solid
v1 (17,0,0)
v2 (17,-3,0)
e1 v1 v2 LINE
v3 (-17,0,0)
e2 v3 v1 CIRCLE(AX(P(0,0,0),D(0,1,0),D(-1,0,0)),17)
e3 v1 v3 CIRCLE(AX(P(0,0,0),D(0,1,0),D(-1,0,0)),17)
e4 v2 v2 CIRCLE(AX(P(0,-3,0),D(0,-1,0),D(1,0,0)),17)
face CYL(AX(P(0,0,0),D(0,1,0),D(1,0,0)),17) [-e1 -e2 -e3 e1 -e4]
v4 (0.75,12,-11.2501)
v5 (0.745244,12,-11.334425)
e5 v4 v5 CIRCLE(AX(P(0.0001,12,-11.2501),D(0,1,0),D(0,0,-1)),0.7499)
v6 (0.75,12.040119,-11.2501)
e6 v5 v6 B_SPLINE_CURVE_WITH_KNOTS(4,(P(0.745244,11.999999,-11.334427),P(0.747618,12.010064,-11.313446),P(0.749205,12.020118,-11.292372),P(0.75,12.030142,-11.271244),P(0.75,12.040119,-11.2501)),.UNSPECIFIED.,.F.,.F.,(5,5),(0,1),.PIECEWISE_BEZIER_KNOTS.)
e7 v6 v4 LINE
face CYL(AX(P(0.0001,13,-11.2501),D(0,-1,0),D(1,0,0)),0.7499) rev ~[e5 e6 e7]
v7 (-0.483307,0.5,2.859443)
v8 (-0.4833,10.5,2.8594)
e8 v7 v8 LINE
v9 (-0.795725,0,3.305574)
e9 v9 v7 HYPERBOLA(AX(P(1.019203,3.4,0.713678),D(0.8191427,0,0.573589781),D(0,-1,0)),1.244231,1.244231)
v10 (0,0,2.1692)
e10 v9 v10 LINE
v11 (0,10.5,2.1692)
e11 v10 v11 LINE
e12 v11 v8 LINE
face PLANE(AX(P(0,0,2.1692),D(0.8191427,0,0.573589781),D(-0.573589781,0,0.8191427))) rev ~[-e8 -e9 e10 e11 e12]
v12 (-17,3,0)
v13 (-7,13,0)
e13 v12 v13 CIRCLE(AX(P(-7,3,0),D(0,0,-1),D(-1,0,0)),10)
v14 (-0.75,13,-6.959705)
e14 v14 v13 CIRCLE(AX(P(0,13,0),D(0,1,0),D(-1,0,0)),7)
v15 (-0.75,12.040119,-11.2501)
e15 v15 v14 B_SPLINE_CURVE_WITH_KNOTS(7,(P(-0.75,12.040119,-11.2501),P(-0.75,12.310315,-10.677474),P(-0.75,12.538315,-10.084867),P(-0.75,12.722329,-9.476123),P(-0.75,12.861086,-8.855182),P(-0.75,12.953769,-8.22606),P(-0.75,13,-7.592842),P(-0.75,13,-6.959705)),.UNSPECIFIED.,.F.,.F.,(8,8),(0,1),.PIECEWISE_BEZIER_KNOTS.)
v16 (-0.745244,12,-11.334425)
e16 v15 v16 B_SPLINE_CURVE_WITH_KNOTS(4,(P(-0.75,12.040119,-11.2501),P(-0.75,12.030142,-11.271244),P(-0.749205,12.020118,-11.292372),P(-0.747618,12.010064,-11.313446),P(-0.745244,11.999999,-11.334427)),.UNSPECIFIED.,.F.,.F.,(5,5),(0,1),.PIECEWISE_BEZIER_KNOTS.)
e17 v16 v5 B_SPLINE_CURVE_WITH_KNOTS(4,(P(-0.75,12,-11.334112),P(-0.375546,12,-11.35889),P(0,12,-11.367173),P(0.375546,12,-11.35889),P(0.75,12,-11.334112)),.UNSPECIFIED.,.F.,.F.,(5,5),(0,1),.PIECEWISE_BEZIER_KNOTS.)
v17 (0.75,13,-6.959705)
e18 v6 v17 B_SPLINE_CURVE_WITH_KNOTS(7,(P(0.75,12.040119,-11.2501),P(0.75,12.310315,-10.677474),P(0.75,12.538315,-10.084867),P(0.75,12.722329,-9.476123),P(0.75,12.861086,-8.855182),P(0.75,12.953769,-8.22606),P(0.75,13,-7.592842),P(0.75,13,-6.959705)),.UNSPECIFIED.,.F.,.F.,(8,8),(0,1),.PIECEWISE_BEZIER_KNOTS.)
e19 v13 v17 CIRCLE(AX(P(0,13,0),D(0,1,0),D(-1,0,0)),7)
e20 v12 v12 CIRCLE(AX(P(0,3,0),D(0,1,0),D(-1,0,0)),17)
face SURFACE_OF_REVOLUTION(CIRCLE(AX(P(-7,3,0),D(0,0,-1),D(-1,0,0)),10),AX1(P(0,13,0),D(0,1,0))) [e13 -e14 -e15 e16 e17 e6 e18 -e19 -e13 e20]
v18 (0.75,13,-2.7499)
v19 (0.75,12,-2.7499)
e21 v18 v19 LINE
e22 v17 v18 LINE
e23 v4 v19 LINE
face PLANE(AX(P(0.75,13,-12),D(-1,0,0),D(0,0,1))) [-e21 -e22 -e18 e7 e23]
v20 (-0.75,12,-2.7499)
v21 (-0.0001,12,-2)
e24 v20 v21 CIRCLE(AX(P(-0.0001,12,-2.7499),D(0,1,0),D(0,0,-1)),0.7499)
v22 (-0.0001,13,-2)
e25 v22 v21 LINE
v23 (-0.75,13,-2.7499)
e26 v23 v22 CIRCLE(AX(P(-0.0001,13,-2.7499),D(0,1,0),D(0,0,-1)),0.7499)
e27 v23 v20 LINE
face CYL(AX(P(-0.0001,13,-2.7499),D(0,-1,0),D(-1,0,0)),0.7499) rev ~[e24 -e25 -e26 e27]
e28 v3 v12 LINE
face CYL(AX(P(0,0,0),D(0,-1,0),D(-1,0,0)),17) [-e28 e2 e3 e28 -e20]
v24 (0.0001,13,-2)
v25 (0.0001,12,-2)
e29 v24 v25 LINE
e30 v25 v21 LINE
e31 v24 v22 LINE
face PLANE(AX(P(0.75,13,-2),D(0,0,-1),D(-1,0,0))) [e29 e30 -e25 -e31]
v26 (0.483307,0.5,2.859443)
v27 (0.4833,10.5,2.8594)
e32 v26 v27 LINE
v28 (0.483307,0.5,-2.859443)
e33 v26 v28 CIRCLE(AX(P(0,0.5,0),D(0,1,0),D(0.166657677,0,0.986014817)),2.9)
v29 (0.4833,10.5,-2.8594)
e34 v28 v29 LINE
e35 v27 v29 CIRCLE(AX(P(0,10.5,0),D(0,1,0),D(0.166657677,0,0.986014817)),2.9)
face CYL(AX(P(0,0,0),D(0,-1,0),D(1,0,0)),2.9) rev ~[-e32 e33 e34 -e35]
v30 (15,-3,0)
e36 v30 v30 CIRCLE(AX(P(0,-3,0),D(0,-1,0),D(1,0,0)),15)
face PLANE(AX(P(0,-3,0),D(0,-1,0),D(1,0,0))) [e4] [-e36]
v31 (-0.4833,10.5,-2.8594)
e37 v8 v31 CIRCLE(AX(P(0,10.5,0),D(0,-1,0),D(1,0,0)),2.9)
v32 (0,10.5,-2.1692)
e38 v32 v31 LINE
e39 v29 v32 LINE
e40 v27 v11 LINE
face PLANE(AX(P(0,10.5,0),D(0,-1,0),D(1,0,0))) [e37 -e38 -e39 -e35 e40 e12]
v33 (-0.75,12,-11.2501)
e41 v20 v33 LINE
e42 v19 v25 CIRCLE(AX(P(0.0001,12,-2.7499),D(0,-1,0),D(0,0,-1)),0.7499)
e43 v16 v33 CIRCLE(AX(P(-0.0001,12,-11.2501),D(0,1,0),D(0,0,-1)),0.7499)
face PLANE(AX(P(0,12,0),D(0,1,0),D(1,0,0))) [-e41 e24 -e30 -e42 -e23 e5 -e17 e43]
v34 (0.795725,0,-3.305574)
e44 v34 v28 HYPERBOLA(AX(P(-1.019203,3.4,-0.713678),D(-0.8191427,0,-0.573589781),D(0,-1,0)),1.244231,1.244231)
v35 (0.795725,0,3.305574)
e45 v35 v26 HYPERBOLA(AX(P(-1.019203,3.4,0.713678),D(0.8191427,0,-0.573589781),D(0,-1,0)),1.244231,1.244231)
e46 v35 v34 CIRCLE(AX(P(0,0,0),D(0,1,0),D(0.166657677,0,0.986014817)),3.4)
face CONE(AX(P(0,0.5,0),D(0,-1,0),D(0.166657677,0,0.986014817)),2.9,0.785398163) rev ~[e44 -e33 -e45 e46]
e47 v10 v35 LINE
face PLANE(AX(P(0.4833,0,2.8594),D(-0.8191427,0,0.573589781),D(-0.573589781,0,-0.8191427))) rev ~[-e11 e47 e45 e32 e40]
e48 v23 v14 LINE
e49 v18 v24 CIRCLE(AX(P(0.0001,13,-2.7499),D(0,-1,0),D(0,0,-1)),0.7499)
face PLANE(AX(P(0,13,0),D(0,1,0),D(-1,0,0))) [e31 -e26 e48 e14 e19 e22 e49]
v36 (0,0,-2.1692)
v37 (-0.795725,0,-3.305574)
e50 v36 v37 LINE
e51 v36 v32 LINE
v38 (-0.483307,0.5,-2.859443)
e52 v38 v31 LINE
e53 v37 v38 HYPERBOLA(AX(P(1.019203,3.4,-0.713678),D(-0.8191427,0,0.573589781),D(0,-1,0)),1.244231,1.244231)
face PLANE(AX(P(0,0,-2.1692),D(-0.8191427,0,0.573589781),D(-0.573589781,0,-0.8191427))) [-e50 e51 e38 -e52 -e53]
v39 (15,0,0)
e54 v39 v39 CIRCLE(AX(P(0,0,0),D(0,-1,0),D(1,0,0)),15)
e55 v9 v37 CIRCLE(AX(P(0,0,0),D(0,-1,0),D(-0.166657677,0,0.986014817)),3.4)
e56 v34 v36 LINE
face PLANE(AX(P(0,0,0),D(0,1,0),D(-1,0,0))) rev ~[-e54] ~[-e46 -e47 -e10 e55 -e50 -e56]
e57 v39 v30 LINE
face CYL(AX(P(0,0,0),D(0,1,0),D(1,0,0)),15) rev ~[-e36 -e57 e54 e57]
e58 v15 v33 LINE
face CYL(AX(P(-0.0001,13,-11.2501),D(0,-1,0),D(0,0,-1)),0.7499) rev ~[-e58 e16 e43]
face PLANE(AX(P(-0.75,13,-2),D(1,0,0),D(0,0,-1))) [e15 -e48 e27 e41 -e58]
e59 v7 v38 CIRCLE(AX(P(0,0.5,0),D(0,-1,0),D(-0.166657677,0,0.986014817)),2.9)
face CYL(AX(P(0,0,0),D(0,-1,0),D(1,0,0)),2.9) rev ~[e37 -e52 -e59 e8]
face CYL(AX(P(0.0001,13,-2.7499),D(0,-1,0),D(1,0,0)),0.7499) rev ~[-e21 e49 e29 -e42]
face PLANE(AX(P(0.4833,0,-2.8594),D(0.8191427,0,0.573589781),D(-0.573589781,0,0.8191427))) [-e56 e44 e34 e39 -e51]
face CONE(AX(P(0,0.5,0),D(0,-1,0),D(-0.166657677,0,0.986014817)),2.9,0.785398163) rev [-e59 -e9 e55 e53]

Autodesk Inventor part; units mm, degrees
ref_plane "YZ Plane" through (0, 0, 0) normal (1, 0, 0) x (0, 1, 0)
ref_plane "XZ Plane" through (0, 0, 0) normal (0, 1, 0) x (-1, 0, 0)
ref_plane "XY Plane" through (0, 0, 0) normal (0, 0, 1) x (1, 0, 0)
sketch "Sketch1" plane through (0, 0, 0) normal (0, 1, 0) x (-1, 0, 0)
  circle A0 centre (0, 0) radius 17
  dimension "d0" = 34
extrude "Extrusion1" add sketch "Sketch1" along normal blind 13
chamfer "Chamfer1" distance 4 angle 45 1 edges at (17, 13, 0)
sketch "Sketch2" plane through (0, 13, 0) normal (0, 1, 0) x (1, 0, 0)
  line L0 (0.75, 2) -> (-0.75, 2)
  line L1 (-0.75, 2) -> (-0.75, 12)
  line L2 (-0.75, 12) -> (0.75, 12)
  line L3 (0.75, 12) -> (0.75, 2)
  circle A0 centre (0, 0) radius 17 projected
  dimension "d6" = 1.5
  dimension "d7" = 10
  dimension "d8" = 2
  dimension "d9" = 16.25
extrude "Extrusion2" cut sketch "Sketch2" against normal blind 1 contours L0 L1 L2 L3
fillet "Fillet1" radius 0.75 4 edges at (0.75, 12.5, -12) (-0.75, 12.5, -12) (-0.75, 12.5, -2) (0.75, 12.5, -2)
sketch "Sketch3" plane through (0, 0, 0) normal (0, -1, 0) x (1, 0, 0)
  circle A0 centre (0, 0) radius 2.9
  line L0 (0, 0) -> (3.3833, 0) construction
  line L1 (0, 0) -> (3.3833, 0) construction
  line L2 (0, 0) -> (2.9, 0) construction
  line L3 (0, 0) -> (2.9, 0) construction
  line L4 (0, 0) -> (2.9, 0) construction
  line L5 (0, 0) -> (-0.4833, -2.8594)
  line L6 (0, 0) -> (2.9, 0) construction
  line L7 (-0.4833, -2.8594) -> (0.4833, -2.8594)
  line L8 (0, 0) -> (-0.4833, 2.8594)
  line L9 (0, 0) -> (2.9, 0) construction
  line L10 (-0.4833, 2.8594) -> (0.4833, 2.8594)
  line L11 (0.4833, 2.8594) -> (1.1703, 2.8594) construction
  line L12 (0.4833, 2.8594) -> (0, 2.1692)
  line L13 (0.4833, 2.8594) -> (1.326, 2.8594) construction
  line L14 (0, 2.1692) -> (-0.4833, 2.8594)
  line L15 (0.4833, -2.8594) -> (0, -2.1692)
  line L16 (0.4833, -2.8594) -> (1.326, -2.8594) construction
  line L17 (0, -2.1692) -> (-0.4833, -2.8594)
  dimension "d13" = 5.8
  dimension "d50" = 99.594
  dimension "d52" = 99.594
  dimension "d54" = 125
  dimension "d55" = 125
extrude "Extrusion7" cut sketch "Sketch3" against normal blind 10.5 contours A0 L15 L17 L5 L8 L14 L12 | L8 L5 A0
sketch "Sketch5" plane through (0, 0, 0) normal (0, -1, 0) x (1, 0, 0)
  circle A0 centre (0, 0) radius 17
  circle A1 centre (0, 0) radius 15
extrude "Extrusion8" add sketch "Sketch5" along normal blind 3
chamfer "Chamfer2" distance 0.5 angle 45 2 edges at (-2.9, 0, 0) (2.9, 0, 0)
fillet "Fillet6" radius 10 2 edges at (13, 13, 0) (17, 9, 0)
properties part number "knob"
